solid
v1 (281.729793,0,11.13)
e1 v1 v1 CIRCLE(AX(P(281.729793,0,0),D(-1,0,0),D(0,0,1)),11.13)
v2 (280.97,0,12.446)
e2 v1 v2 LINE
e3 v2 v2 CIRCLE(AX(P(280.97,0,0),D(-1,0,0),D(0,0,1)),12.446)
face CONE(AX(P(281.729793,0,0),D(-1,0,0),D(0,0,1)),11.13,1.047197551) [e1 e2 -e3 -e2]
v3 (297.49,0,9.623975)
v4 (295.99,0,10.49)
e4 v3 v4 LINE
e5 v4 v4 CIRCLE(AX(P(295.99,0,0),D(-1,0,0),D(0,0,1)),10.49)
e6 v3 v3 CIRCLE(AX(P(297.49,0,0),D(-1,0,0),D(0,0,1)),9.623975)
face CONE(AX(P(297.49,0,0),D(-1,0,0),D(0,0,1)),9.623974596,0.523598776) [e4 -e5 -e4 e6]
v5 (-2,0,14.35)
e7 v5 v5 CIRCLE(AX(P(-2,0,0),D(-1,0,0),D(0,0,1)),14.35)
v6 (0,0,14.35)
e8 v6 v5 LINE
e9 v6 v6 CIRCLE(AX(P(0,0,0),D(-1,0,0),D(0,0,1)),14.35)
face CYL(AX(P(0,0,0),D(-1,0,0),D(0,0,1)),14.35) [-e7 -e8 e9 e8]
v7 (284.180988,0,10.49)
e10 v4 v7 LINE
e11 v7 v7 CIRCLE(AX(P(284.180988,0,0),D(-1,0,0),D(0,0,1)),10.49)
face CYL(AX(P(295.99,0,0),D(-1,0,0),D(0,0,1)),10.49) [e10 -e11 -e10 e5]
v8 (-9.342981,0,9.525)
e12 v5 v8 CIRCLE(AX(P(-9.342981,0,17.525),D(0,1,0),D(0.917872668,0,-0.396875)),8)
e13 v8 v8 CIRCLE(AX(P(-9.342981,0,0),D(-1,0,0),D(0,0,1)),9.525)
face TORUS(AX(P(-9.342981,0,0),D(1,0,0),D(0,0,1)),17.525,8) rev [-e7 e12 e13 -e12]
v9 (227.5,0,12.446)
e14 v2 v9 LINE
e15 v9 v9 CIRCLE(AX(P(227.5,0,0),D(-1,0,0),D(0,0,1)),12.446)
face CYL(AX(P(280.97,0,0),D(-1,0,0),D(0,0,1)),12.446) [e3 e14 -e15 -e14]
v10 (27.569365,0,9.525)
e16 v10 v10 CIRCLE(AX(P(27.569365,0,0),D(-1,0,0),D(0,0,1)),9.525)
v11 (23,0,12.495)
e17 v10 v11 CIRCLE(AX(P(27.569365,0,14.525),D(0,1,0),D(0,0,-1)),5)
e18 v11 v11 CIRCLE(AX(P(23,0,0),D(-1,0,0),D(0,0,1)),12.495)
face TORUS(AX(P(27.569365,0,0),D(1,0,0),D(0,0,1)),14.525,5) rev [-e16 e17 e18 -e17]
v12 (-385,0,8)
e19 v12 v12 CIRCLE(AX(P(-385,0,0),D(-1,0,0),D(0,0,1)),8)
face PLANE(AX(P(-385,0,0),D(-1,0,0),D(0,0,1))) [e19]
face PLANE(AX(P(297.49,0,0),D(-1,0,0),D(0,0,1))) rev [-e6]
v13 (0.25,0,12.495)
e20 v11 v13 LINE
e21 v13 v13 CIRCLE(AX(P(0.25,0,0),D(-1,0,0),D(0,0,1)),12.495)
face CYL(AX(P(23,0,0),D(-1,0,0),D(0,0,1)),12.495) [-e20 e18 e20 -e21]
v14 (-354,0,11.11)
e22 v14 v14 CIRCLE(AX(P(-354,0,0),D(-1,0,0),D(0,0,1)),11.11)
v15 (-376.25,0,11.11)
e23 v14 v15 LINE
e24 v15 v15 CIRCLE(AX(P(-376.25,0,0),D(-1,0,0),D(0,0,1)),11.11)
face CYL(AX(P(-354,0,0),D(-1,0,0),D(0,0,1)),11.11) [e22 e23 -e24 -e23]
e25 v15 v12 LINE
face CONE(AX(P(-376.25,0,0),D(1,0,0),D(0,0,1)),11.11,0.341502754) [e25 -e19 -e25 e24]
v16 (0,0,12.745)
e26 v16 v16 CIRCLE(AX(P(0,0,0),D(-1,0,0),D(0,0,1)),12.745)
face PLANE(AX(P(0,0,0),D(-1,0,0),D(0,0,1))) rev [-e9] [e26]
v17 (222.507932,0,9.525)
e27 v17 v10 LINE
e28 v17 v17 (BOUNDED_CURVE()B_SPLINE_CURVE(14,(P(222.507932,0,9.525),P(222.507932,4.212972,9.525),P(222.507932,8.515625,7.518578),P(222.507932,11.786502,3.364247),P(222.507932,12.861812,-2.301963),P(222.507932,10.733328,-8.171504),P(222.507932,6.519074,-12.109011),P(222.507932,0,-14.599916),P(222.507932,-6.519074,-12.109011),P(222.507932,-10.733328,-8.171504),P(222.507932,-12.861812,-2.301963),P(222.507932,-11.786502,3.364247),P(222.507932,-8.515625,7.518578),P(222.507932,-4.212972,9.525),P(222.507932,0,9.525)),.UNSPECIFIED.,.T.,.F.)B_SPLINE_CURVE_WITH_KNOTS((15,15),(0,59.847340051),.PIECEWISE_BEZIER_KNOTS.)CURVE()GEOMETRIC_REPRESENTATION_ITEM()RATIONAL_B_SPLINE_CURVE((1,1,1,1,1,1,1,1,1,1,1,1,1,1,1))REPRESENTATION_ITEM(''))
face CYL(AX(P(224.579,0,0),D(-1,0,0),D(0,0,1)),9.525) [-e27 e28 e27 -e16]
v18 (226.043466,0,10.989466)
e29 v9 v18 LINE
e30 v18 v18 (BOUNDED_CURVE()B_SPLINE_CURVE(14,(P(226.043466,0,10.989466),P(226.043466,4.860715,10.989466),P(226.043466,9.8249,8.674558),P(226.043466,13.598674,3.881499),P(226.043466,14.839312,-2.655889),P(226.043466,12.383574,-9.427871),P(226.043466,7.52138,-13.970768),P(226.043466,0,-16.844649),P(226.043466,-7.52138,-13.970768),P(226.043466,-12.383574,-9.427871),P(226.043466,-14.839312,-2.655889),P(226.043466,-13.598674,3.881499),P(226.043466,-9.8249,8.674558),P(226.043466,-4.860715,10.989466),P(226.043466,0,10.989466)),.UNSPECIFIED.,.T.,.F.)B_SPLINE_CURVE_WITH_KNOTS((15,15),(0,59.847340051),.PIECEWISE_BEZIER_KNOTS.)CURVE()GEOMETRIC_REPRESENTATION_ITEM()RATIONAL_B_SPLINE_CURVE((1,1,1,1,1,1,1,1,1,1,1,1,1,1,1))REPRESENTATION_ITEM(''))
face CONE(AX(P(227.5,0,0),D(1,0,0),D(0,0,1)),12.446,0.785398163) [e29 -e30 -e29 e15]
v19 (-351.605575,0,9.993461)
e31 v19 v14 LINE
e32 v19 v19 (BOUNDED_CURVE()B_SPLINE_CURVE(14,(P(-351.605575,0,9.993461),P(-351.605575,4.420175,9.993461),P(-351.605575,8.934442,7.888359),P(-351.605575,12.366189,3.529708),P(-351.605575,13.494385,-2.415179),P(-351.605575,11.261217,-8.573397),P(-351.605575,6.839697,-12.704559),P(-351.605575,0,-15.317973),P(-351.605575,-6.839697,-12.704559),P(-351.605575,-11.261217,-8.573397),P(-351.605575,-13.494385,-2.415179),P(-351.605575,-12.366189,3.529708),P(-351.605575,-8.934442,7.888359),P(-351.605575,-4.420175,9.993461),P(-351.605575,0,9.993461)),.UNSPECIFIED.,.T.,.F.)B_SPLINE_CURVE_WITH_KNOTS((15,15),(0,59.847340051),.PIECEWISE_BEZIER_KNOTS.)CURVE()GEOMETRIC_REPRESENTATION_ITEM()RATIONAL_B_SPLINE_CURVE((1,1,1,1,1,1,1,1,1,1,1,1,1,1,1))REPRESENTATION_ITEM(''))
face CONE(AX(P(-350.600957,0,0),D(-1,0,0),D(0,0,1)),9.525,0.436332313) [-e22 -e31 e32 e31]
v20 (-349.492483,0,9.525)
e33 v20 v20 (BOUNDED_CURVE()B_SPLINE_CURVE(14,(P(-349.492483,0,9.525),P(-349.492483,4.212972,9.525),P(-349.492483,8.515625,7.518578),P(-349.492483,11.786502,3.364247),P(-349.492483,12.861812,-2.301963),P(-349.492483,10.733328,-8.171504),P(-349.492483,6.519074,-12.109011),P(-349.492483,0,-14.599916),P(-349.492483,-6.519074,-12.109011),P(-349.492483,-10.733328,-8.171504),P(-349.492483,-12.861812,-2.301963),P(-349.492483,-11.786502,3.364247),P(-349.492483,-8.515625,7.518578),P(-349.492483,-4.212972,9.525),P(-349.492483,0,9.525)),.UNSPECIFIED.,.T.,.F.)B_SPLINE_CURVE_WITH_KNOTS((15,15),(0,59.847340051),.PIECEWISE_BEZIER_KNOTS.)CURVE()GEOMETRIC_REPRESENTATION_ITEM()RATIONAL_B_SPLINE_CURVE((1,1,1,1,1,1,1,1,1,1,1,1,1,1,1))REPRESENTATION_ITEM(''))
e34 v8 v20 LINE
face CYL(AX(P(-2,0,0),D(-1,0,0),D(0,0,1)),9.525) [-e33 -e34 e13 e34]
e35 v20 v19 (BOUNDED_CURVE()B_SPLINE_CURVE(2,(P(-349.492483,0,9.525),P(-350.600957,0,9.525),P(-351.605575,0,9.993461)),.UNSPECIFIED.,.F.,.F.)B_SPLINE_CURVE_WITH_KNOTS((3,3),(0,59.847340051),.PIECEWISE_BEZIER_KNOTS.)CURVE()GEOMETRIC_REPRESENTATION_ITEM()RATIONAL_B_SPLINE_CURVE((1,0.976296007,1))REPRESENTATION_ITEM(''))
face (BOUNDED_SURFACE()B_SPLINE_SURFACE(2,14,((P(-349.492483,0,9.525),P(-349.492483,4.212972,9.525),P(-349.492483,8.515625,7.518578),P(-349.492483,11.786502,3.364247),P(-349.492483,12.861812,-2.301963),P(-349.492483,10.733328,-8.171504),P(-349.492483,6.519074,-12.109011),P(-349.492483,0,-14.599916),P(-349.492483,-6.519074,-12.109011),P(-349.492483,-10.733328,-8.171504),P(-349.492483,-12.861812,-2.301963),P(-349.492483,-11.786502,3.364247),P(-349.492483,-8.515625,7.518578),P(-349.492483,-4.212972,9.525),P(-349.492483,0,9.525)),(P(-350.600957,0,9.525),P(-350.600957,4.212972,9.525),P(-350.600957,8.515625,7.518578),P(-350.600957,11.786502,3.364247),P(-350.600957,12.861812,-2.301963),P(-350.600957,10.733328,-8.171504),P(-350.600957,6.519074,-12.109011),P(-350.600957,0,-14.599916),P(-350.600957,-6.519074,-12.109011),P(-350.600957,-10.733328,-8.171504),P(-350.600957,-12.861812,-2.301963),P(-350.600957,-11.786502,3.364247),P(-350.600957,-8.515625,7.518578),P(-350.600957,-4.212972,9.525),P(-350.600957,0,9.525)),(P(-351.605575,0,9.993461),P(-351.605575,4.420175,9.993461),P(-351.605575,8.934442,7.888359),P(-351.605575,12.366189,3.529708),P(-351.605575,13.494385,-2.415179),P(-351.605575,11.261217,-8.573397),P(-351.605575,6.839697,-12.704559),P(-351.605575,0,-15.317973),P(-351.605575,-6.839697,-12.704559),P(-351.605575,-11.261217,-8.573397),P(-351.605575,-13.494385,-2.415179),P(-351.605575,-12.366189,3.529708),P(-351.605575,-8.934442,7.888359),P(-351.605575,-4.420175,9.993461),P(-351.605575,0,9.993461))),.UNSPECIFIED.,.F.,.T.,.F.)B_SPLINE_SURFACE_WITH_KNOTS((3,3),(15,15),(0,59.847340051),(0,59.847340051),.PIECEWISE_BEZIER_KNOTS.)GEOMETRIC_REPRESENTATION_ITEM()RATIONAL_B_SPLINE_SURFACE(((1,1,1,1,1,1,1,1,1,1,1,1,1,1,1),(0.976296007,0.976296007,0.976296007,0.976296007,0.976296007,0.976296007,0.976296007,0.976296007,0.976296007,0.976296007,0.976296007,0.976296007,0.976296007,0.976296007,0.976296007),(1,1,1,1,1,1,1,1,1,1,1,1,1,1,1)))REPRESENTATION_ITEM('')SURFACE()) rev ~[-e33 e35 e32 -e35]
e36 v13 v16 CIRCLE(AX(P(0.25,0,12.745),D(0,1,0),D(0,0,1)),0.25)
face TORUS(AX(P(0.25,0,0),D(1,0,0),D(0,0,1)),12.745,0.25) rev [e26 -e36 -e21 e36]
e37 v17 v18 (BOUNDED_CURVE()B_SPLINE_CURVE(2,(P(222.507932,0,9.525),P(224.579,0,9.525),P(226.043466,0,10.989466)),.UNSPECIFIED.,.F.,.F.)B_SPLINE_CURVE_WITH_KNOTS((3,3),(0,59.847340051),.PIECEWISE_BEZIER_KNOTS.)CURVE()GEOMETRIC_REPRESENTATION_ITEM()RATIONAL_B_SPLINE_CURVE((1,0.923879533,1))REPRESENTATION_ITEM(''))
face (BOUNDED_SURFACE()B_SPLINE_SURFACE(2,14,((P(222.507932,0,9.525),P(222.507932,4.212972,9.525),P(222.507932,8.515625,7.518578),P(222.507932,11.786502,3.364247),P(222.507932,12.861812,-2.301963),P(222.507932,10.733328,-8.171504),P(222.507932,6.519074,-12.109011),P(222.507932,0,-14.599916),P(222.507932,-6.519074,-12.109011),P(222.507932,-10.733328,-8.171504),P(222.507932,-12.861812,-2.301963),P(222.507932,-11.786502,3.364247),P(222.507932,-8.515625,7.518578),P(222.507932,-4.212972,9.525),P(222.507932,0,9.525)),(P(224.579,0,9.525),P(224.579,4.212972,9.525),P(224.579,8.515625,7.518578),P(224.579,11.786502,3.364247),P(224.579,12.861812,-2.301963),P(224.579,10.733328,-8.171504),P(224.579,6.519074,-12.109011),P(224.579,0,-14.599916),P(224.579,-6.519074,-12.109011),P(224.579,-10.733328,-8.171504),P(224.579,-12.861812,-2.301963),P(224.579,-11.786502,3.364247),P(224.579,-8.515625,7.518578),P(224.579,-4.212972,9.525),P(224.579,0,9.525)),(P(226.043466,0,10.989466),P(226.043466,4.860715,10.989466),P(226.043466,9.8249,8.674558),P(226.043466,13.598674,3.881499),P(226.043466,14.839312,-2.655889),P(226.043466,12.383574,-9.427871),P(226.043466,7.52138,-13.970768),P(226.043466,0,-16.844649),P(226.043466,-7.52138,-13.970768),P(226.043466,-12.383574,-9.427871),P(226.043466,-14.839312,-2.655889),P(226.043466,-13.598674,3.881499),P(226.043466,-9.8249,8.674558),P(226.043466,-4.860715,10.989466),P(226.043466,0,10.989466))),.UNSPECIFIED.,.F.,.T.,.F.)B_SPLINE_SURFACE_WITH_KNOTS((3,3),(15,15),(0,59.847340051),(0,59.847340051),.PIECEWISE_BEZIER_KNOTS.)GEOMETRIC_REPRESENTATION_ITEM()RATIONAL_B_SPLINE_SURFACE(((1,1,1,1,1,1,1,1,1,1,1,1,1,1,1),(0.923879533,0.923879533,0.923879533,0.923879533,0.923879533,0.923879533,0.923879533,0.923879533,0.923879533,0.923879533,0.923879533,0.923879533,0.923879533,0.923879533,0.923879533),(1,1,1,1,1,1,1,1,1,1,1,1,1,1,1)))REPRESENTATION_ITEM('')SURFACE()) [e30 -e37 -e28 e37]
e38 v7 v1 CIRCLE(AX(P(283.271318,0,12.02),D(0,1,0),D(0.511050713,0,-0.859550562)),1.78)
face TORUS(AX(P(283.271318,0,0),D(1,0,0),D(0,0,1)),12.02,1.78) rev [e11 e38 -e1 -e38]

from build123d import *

# Parameters (mm, degrees)
F4_R = 0.25
F5_R = 5
F6_R = 5


# Not quite as in the source:
# - a fillet or chamfer that OpenCascade refuses, or shapes differently, is made with other operations: its cross-section is extruded or revolved along the edge and cut away or added


with BuildPart() as f1:
    # F0 (on Front) → F1 (revolve)
    with BuildSketch(Plane.XZ):
        with BuildLine():
            Line((-2, 9.525), (-350.6009565311, 9.525))
            Line((-350.6009565311, 9.525), (-354, 11.11))
            Line((-354, 11.11), (-376.25, 11.11))
            Line((-376.25, 11.11), (-385, 8))
            Line((-385, 8), (-385, 0))
            Line((-385, 0), (297.49, 0))
            Line((297.49, 0), (297.49, 9.6239745962))
            Line((297.49, 9.6239745962), (295.99, 10.49))
            Line((295.99, 10.49), (284.1809884429, 10.49))
            ThreePointArc((284.1809884429, 10.49), (282.8216403227, 10.297737003), (281.7297929543, 11.13))
            Line((281.7297929543, 11.13), (280.97, 12.446))
            Line((280.97, 12.446), (227.5, 12.446))
            Line((227.5, 12.446), (224.579, 9.525))
            Line((224.579, 9.525), (23, 9.525))
            Line((23, 9.525), (23, 12.495))
            Line((23, 12.495), (0, 12.495))
            Line((0, 12.495), (0, 14.35))
            Line((0, 14.35), (-2, 14.35))
            Line((-2, 14.35), (-2, 9.525))
        make_face()
    revolve(axis=Axis((-43.755, 0, 0), (-1, 0, 0)))

    # F2: fillet of radius 8 on 1 edges, made by hand

    # F2_s1 → F2_t2 (revolve)
    with BuildSketch(Plane.XZ):
        with BuildLine():
            ThreePointArc((-2, 14.35), (-4.9498048155, 10.8391941398), (-9.3429813428, 9.525))
            Line((-9.3429813428, 9.525), (-2, 9.525))
            Line((-2, 9.525), (-2, 14.35))
        make_face()
    revolve(axis=Axis((-2, 0, 0), (-1, 0, 0)))

    # F3: fillet of radius 5 on 1 edges, made by hand

    # F3_s1 → F3_t2 (revolve)
    with BuildSketch(Plane.XZ):
        with BuildLine():
            ThreePointArc((27.5693653826, 9.525), (24.8444800639, 10.3327452367), (23, 12.495))
            Line((23, 12.495), (23, 9.525))
            Line((23, 9.525), (27.5693653826, 9.525))
        make_face()
    revolve(axis=Axis((23, 0, 0), (-1, 0, 0)))

    # F4
    f4_edges = [f1.edges().sort_by_distance(p)[0] for p in [
        (0, 0, -12.495),
    ]]
    fillet(f4_edges, radius=F4_R)

    # F5
    f5_edges = [f1.edges().sort_by_distance(p)[0] for p in [
        (-350.600957, 0, -9.525),
    ]]
    fillet(f5_edges, radius=F5_R)

    # F6
    f6_edges = [f1.edges().sort_by_distance(p)[0] for p in [
        (224.579, 0, -9.525),
    ]]
    fillet(f6_edges, radius=F6_R)


solid = f1.part
